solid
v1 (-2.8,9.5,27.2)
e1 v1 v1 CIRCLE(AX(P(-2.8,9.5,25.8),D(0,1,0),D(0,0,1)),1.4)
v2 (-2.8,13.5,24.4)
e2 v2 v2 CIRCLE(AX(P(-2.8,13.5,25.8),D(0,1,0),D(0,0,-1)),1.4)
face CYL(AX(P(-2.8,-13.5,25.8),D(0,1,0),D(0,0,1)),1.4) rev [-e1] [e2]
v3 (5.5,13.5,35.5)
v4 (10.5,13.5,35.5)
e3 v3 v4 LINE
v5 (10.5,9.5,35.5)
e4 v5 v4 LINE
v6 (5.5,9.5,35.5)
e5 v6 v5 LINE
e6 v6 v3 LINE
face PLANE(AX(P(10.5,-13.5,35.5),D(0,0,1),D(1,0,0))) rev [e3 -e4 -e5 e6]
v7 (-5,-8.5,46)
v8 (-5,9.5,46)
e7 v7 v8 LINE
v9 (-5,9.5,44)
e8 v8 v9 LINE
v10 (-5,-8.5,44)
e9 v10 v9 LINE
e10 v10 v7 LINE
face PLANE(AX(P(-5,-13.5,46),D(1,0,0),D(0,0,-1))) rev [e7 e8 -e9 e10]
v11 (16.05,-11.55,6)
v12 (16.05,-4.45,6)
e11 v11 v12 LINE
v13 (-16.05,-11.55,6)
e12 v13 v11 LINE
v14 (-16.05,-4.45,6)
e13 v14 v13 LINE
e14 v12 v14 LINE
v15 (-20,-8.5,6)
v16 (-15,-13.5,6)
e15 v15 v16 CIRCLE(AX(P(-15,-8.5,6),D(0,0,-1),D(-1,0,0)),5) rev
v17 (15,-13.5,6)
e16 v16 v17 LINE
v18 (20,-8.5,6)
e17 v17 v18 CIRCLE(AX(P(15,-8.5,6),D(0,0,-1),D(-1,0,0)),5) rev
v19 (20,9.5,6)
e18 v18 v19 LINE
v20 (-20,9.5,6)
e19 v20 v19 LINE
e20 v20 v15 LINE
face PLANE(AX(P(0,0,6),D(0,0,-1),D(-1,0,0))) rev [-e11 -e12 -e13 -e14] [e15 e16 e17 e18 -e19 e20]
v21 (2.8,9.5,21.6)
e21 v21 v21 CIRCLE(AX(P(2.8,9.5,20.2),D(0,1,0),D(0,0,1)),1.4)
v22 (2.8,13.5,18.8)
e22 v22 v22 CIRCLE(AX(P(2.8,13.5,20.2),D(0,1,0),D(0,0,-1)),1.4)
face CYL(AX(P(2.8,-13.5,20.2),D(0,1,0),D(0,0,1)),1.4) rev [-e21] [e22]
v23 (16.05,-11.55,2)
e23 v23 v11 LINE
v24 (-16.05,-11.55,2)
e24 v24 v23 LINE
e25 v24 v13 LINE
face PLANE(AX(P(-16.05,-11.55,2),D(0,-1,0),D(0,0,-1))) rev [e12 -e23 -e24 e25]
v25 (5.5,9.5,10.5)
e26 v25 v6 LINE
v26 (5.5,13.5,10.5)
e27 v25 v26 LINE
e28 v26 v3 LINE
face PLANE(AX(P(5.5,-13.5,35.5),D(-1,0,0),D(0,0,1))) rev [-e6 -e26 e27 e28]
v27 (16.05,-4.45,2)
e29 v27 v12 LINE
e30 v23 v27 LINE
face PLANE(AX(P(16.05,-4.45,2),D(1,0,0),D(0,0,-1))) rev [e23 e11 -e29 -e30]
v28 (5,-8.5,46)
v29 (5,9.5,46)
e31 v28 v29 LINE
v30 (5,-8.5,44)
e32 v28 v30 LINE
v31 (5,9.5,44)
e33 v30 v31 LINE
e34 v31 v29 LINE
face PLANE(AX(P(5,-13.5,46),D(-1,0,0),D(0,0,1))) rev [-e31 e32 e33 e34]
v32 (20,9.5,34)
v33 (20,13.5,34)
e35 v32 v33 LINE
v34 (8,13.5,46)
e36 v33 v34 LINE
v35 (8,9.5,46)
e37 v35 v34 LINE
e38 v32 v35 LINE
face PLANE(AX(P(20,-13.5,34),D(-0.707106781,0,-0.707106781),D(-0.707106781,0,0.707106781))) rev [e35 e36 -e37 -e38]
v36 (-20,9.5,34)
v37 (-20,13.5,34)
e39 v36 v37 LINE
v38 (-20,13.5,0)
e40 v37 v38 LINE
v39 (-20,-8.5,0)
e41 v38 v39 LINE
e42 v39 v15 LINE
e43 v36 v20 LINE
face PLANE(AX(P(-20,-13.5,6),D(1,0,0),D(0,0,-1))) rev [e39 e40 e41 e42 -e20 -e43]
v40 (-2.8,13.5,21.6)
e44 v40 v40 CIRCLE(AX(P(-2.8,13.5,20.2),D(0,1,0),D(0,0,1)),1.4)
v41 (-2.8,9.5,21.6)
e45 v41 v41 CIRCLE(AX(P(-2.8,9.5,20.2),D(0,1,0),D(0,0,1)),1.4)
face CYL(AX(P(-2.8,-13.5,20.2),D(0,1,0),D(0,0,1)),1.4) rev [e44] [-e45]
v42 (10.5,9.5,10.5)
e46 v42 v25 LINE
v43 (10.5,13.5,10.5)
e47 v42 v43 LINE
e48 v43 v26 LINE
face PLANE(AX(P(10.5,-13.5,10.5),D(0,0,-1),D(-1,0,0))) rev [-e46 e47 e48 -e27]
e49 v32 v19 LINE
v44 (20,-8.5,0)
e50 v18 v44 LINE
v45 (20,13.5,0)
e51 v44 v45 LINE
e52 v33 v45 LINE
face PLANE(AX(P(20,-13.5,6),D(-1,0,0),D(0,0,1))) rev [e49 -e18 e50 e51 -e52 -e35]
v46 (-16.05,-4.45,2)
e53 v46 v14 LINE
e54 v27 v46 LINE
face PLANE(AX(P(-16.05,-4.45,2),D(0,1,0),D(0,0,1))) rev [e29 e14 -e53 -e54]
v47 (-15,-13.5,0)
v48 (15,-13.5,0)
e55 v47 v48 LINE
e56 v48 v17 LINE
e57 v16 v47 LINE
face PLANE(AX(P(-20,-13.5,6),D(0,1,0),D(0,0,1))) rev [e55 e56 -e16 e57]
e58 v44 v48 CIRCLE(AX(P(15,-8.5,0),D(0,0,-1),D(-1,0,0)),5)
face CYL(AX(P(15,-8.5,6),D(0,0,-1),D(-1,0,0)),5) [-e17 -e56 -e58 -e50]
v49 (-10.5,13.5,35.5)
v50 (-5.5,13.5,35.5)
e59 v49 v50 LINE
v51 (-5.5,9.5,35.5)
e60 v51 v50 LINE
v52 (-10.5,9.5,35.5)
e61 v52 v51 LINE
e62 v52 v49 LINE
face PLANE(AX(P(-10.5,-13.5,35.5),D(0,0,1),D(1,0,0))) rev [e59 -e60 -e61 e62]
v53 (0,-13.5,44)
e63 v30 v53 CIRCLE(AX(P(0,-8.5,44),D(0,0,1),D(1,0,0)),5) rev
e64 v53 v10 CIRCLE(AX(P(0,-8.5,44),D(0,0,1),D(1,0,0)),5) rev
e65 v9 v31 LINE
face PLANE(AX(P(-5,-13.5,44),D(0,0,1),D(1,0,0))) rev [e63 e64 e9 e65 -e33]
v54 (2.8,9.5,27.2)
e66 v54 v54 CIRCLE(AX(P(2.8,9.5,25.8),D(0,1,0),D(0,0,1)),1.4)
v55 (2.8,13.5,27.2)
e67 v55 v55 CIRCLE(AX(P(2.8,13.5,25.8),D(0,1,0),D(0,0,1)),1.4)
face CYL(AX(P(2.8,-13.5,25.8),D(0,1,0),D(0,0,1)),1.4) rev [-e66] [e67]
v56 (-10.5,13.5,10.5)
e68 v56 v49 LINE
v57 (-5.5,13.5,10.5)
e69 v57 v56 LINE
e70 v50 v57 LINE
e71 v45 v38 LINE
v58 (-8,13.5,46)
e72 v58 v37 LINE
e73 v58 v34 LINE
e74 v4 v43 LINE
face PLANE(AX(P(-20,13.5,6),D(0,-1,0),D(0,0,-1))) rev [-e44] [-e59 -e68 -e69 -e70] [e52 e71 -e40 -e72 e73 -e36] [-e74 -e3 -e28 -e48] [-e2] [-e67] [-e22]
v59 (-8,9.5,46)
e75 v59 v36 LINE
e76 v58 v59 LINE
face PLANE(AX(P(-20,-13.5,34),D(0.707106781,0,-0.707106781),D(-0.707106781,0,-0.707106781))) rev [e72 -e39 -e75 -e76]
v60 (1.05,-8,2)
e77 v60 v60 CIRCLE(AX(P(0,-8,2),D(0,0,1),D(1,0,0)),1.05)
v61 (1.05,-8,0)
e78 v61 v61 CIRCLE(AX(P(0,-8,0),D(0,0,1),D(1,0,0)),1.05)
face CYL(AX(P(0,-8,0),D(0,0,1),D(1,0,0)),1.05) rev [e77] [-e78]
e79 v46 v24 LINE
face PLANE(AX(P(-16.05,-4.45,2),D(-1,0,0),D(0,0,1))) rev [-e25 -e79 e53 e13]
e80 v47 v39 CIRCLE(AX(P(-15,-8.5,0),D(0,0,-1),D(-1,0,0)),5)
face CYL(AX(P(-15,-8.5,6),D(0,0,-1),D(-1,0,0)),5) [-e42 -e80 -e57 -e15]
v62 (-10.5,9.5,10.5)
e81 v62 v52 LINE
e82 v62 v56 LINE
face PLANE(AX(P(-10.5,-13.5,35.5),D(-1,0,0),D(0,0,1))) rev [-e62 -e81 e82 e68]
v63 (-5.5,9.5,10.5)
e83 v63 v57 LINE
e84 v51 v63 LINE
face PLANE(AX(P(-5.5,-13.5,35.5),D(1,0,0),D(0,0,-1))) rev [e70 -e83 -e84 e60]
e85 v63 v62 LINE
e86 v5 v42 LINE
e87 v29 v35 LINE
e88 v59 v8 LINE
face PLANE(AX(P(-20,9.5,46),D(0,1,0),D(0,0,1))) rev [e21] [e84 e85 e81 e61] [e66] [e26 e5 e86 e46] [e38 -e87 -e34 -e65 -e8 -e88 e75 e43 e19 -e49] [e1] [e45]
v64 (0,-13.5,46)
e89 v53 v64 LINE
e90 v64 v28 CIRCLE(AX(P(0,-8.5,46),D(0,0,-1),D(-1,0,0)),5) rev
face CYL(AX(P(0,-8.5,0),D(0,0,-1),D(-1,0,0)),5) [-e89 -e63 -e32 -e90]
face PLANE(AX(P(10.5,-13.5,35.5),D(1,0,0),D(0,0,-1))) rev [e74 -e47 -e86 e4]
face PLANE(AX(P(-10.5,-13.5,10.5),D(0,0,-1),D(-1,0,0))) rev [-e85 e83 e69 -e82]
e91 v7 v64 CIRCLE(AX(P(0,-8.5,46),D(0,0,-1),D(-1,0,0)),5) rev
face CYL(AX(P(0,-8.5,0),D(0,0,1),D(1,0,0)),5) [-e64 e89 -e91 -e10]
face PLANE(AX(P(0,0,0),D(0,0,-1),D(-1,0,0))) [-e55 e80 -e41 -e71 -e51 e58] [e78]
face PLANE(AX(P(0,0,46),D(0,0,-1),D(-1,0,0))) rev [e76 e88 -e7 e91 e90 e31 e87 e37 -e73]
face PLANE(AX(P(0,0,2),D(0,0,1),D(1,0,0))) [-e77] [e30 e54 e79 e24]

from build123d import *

# Parameters (mm, degrees)
SCHIZZO3_W                   = 40
SCHIZZO3_H                   = 27
ESTRUSIONE_ESTRUSIONE1_DEPTH = 6
SCHIZZO4_W                   = 32.1
SCHIZZO4_H                   = 7.1
TAGLIO_ESTRUSIONE1_DEPTH     = 4
SCHIZZO5_R                   = 1.05
TAGLIO_ESTRUSIONE2_DEPTH     = 25.459149617
SCHIZZO6_W                   = 40
SCHIZZO6_H                   = 4
ESTRUSIONE_ESTRUSIONE2_DEPTH = 40
SCHIZZO7_W                   = 10
SCHIZZO7_H                   = 2
ESTRUSIONE_ESTRUSIONE3_DEPTH = 23
SCHIZZO8_R                   = 1.4
SCHIZZO8_W                   = 5
SCHIZZO8_H                   = 25
TAGLIO_ESTRUSIONE3_DEPTH     = 57.964901475
RACCORDO1_R                  = 5


with BuildPart() as part:
    # Schizzo3 → Estrusione-Estrusione1 (new body)
    with BuildSketch(Plane.XY):
        Rectangle(SCHIZZO3_W, SCHIZZO3_H)
    extrude(amount=ESTRUSIONE_ESTRUSIONE1_DEPTH)

    # Schizzo4 → Taglio-Estrusione1 (cut)
    with BuildSketch(Plane.XY.offset(6)):
        with Locations((0, -8)):
            Rectangle(SCHIZZO4_W, SCHIZZO4_H)
    extrude(amount=-TAGLIO_ESTRUSIONE1_DEPTH, mode=Mode.SUBTRACT)

    # Schizzo5 → Taglio-Estrusione2 (cut, through all)
    with BuildSketch(Plane.XY.offset(2)):
        with Locations((0, -8)):
            Circle(SCHIZZO5_R)
    extrude(amount=-TAGLIO_ESTRUSIONE2_DEPTH, mode=Mode.SUBTRACT)

    # Schizzo6 → Estrusione-Estrusione2 (add)
    with BuildSketch(Plane.XY.offset(6)):
        with Locations((0, 11.5)):
            Rectangle(SCHIZZO6_W, SCHIZZO6_H)
    extrude(amount=ESTRUSIONE_ESTRUSIONE2_DEPTH)

    # Schizzo7 → Estrusione-Estrusione3 (add)
    with BuildSketch(Plane.XZ.offset(-9.5)):
        with Locations((0, 45)):
            Rectangle(SCHIZZO7_W, SCHIZZO7_H)
    extrude(amount=ESTRUSIONE_ESTRUSIONE3_DEPTH)

    # Schizzo8 → Taglio-Estrusione3 (cut, through all)
    with BuildSketch(Plane(origin=(0, 13.5, 0), x_dir=(1, 0, 0), z_dir=(0, 1, 0))):
        with Locations(Location((-2.8, -20.2, 0), (0, 0, 270))):
            Circle(SCHIZZO8_R)
        with Locations(Location((-2.8, -25.8, 0), (0, 0, 270))):
            Circle(SCHIZZO8_R)
        with Locations(Location((2.8, -25.8, 0), (0, 0, 270))):
            Circle(SCHIZZO8_R)
        with Locations(Location((2.8, -20.2, 0), (0, 0, 270))):
            Circle(SCHIZZO8_R)
        with Locations((8, -23)):
            Rectangle(SCHIZZO8_W, SCHIZZO8_H)
        with Locations((-8, -23)):
            Rectangle(SCHIZZO8_W, SCHIZZO8_H)
        Polygon((-20, -34), (-8, -46), (-20, -46), align=None)
        Polygon((8, -46), (20, -46), (20, -34), align=None)
    extrude(amount=-TAGLIO_ESTRUSIONE3_DEPTH, mode=Mode.SUBTRACT)

    # Raccordo1
    raccordo1_edges = [part.edges().sort_by_distance(p)[0] for p in [
        (-5, -13.5, 45),
        (5, -13.5, 45),
        (20, -13.5, 3),
        (-20, -13.5, 3),
    ]]
    fillet(raccordo1_edges, radius=RACCORDO1_R - 0.0001)  # a hair under: the kernel refuses the full size


solid = part.part
